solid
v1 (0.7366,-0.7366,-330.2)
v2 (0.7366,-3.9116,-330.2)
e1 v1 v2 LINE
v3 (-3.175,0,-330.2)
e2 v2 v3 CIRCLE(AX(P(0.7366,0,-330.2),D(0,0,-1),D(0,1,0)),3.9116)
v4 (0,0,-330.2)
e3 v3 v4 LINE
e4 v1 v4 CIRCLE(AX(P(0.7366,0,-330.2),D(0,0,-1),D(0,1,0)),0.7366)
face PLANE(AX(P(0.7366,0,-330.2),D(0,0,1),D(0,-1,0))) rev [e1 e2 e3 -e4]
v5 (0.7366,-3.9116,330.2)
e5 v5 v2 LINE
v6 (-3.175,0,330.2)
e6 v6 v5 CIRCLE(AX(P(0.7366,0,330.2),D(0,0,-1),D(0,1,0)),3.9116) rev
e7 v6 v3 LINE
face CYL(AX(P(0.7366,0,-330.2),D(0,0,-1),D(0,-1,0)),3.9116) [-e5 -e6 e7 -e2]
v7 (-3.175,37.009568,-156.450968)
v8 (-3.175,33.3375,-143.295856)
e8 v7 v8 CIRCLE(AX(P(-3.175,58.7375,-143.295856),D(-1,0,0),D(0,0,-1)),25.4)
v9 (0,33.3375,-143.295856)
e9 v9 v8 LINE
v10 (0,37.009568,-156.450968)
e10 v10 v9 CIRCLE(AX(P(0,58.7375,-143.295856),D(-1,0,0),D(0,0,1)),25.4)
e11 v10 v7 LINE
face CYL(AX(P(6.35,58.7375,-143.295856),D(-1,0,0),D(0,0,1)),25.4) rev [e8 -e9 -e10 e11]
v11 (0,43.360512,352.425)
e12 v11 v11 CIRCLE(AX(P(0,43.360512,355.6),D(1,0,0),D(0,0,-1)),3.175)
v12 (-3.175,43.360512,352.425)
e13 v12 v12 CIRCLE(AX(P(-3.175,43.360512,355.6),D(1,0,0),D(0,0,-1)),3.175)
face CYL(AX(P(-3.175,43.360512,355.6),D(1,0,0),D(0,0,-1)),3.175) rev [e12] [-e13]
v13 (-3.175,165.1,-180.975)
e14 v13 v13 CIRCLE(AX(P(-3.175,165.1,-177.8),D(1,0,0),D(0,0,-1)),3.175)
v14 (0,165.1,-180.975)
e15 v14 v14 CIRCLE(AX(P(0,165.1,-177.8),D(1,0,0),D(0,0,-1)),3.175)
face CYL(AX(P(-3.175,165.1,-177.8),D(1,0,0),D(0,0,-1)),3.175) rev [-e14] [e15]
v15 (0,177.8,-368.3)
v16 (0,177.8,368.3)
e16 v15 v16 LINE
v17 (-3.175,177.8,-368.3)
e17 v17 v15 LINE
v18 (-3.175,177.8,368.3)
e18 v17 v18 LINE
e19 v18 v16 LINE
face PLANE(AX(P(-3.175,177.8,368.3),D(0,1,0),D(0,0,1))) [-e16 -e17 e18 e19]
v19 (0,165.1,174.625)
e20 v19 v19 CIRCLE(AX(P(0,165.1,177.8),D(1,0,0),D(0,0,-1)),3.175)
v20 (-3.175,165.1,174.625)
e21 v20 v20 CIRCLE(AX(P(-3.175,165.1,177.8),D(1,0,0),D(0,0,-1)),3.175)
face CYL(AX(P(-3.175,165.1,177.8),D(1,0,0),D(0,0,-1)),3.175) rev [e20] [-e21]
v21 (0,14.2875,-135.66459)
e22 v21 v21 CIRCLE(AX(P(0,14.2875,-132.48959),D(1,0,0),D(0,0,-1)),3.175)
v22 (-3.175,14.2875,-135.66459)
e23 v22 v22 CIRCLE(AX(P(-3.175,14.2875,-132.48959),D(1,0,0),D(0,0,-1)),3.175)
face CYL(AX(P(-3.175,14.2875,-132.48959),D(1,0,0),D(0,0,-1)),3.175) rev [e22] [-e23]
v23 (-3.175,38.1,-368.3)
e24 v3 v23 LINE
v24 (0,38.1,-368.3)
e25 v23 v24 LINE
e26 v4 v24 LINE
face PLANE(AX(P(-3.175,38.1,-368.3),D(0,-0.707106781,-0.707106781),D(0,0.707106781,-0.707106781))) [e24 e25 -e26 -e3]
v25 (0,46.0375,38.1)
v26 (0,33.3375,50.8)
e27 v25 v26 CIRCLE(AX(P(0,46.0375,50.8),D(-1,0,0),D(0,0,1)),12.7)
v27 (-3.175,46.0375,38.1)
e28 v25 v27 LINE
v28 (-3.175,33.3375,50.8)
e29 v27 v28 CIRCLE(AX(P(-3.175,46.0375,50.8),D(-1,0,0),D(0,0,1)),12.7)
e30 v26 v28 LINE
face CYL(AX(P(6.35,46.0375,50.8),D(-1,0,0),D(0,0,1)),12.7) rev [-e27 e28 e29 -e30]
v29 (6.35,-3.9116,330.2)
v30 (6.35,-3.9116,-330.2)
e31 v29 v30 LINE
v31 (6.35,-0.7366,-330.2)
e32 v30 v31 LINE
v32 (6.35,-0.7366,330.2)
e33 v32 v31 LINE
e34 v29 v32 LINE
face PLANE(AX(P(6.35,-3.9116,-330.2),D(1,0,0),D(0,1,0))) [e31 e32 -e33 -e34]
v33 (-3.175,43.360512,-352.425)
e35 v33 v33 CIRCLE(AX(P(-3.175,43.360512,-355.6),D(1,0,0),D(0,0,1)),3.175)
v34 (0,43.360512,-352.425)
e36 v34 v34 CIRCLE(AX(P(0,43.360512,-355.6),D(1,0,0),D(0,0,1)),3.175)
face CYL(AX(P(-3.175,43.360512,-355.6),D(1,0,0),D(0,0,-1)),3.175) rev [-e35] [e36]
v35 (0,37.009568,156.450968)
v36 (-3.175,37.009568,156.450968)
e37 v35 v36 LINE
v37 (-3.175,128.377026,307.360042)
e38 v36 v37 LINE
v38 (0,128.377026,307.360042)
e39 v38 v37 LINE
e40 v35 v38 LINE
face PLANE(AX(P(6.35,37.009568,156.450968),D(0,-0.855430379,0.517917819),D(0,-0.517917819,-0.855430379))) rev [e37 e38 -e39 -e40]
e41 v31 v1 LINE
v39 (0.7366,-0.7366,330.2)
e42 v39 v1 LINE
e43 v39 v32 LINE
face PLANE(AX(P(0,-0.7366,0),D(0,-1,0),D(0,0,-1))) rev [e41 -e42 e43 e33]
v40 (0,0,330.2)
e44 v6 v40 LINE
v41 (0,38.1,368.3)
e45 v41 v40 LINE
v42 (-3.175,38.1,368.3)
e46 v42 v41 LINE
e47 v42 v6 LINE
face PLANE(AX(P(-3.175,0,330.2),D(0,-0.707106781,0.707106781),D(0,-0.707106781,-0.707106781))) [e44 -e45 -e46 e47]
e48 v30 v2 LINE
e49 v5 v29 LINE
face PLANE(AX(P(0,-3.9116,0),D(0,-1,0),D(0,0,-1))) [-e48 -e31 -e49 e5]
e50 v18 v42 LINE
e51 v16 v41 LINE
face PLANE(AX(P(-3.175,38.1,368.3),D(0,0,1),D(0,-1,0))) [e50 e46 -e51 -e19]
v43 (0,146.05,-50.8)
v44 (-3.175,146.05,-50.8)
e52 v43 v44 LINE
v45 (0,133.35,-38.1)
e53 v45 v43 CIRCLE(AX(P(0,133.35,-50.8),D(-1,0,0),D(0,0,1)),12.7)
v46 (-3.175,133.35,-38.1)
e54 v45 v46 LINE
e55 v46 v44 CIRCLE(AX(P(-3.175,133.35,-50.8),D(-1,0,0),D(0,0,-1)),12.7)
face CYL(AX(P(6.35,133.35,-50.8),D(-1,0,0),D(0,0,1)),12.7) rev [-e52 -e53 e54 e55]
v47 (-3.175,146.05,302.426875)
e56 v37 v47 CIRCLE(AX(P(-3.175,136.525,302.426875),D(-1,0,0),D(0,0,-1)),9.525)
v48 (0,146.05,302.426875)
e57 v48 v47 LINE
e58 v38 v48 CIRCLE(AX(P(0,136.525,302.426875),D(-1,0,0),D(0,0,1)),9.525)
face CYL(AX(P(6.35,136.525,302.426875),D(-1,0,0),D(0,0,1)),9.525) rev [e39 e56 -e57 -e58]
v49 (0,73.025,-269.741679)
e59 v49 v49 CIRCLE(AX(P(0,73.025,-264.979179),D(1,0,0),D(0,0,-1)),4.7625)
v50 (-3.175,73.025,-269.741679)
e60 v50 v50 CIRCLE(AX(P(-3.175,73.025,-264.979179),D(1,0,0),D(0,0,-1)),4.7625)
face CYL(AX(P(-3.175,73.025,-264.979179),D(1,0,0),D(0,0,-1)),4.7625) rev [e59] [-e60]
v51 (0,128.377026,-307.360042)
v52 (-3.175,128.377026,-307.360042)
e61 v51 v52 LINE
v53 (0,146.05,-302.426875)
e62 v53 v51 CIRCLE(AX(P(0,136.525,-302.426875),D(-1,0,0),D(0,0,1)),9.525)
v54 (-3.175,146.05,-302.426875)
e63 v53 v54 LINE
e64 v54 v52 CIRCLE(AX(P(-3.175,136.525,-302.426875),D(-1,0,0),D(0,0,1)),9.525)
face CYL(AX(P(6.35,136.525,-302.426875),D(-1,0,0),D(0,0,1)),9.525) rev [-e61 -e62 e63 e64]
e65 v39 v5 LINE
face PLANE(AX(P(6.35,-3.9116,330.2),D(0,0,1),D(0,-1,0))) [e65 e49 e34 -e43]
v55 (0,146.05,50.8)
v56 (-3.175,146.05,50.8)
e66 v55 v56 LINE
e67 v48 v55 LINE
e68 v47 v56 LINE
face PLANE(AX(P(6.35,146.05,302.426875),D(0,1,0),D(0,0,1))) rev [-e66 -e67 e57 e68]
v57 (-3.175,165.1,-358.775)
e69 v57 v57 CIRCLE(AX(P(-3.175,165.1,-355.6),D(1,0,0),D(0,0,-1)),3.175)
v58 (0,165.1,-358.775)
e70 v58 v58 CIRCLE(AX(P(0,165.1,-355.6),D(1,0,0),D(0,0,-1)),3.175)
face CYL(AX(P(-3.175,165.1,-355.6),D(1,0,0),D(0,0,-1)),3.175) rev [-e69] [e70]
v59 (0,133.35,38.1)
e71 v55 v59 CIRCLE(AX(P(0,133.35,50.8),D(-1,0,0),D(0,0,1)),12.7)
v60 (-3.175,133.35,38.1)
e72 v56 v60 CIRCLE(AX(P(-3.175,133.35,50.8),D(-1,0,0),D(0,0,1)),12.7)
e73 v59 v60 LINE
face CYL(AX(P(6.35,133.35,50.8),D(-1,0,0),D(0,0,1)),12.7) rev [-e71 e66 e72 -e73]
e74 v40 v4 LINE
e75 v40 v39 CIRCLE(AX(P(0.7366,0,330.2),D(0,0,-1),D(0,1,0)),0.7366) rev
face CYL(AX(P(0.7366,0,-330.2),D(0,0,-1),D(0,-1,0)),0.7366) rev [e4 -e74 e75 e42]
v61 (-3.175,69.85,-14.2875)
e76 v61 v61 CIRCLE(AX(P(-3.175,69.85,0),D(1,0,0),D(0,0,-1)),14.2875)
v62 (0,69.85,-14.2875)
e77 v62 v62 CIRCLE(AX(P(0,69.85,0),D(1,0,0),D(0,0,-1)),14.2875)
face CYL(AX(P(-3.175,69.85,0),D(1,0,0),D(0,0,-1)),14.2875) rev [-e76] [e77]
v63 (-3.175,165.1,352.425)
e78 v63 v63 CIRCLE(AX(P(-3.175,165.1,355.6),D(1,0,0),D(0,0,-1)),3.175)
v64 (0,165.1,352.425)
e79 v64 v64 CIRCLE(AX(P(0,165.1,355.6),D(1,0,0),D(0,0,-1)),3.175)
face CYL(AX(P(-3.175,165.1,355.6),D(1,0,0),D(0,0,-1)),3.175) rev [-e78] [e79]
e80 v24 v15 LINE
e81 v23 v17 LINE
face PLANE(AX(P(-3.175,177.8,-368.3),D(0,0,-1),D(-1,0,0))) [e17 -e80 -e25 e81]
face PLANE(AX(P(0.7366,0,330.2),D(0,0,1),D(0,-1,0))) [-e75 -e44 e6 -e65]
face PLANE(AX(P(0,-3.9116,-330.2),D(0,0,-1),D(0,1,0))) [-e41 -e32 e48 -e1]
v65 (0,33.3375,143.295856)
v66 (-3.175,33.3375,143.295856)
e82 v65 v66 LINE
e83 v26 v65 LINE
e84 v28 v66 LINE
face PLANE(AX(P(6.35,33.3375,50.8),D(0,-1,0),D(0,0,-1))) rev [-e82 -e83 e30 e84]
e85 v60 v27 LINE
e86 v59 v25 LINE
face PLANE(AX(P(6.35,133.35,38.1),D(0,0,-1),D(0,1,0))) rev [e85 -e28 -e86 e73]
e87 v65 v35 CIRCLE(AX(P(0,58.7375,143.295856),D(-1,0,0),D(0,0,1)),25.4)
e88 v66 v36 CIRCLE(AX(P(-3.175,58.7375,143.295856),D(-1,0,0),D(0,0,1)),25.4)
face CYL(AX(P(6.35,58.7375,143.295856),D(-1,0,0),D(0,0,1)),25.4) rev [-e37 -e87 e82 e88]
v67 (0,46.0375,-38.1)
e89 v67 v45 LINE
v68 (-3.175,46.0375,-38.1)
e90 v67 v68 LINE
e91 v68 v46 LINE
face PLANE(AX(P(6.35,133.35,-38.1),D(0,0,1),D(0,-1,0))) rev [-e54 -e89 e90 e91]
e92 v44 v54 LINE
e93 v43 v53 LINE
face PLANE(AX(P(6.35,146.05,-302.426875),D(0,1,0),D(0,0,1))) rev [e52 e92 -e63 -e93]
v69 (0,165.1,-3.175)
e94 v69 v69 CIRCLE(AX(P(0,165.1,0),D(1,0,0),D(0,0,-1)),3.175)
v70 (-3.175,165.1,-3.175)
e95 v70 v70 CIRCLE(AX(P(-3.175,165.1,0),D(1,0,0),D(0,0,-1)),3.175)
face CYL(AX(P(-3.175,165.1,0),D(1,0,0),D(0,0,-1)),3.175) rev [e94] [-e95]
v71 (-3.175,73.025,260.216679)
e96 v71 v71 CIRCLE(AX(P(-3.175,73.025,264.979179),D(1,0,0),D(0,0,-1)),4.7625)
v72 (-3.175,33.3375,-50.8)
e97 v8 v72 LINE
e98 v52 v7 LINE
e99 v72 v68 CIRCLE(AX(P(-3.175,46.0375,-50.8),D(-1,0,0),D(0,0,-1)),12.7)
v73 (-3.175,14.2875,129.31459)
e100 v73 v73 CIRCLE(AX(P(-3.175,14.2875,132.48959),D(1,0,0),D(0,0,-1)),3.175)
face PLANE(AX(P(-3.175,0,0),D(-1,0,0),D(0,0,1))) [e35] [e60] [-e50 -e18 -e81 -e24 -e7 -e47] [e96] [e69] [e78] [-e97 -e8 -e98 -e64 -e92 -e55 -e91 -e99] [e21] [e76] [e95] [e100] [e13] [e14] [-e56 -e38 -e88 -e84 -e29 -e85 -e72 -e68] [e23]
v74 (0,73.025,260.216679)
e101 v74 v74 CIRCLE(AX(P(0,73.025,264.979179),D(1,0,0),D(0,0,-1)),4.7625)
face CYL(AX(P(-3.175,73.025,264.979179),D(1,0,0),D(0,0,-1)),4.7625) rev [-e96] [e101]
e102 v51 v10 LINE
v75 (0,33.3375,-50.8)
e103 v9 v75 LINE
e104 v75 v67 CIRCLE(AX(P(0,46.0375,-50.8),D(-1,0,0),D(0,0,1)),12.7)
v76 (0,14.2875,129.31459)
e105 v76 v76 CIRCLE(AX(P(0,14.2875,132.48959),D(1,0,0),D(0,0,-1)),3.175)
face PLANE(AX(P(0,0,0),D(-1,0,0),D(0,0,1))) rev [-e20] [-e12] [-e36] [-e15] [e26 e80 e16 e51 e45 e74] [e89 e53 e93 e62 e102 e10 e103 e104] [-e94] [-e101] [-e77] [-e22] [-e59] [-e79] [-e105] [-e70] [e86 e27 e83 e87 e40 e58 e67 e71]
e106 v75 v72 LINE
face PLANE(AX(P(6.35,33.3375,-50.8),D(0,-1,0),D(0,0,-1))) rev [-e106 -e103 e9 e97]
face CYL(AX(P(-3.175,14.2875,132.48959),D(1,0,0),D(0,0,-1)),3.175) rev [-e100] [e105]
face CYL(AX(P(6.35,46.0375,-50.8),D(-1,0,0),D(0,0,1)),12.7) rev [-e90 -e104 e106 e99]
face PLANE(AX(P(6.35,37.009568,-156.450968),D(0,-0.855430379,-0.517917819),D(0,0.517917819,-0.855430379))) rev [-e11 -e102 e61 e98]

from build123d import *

# Parameters (mm, degrees)
BASE_FLANGE1_DEPTH = 3.175
EDGE_FLANGE1_DEPTH = 660.4
SKETCH9_R          = 3.175
SKETCH9_R_2        = 14.2875
SKETCH9_R_3        = 4.7625
CUT_EXTRUDE1_DEPTH = 410.020846046
CUT_EXTRUDE2_DEPTH = 410.082455778


# Sheet-metal steps are written as plain solids
with BuildPart() as part:
    # Sketch1 → Base-Flange1 (new body)
    with BuildSketch(Plane(origin=(0, 0, 0), x_dir=(0, 0, -1), z_dir=(1, 0, 0))):
        Polygon((330.2, 0), (-330.2, 0), (-368.3, 38.1), (-368.3, 177.8), (368.3, 177.8), (368.3, 38.1), align=None)
    extrude(amount=-BASE_FLANGE1_DEPTH)

    # Edge-Flange1 section (across the edge) → Edge-Flange1 (add)
    with BuildSketch(Plane(origin=(0, -0.7366, 330.2), x_dir=(0, 1, 0), z_dir=(0, 0, -1))):
        with BuildLine():
            Line((-3.175, 0.7366), (-3.175, 6.35))
            Line((-3.175, 6.35), (0, 6.35))
            Line((0, 6.35), (0, 0.7366))
            ThreePointArc((0, 0.7366), (0.215745145, 0.215745145), (0.7366, 0))
            Line((0.7366, 0), (0.7366, -3.175))
            ThreePointArc((0.7366, -3.175), (-2.029318885, -2.029318885), (-3.175, 0.7366))
        make_face()
    extrude(amount=EDGE_FLANGE1_DEPTH)

    # Sketch9 → Cut-Extrude1 (cut, through all)
    with BuildSketch(Plane(origin=(0, 0, 0), x_dir=(0, 0, -1), z_dir=(1, 0, 0))):
        with Locations((-355.6, 165.1)):
            Circle(SKETCH9_R)
        with Locations((-355.6, 43.360512242)):
            Circle(SKETCH9_R)
        with Locations((-177.8, 165.1)):
            Circle(SKETCH9_R)
        with Locations((0, 165.1)):
            Circle(SKETCH9_R)
        with Locations((-132.489589571, 14.2875)):
            Circle(SKETCH9_R)
        with Locations((132.489589571, 14.2875)):
            Circle(SKETCH9_R)
        with Locations((177.8, 165.1)):
            Circle(SKETCH9_R)
        with Locations((355.6, 165.1)):
            Circle(SKETCH9_R)
        with Locations(Location((355.6, 43.360512242, 0), (0, 0, 180))):
            Circle(SKETCH9_R)
        with Locations((0, 69.85)):
            Circle(SKETCH9_R_2)
        with Locations((-264.979179141, 73.025)):
            Circle(SKETCH9_R_3)
        with Locations((264.979179141, 73.025)):
            Circle(SKETCH9_R_3)
    extrude(amount=-CUT_EXTRUDE1_DEPTH, mode=Mode.SUBTRACT)

    # Sketch10 → Cut-Extrude2 (cut, through all)
    with BuildSketch(Plane.ZY.offset(3.175)):
        with BuildLine():
            Line((-302.426875206, 146.05), (-50.8, 146.05))
            ThreePointArc((-50.8, 146.05), (-41.819743879, 142.330256121), (-38.1, 133.35))
            Line((-38.1, 133.35), (-38.1, 46.0375))
            ThreePointArc((-38.1, 46.0375), (-41.819743879, 37.057243879), (-50.8, 33.3375))
            Line((-50.8, 33.3375), (-143.295855515, 33.3375))
            ThreePointArc((-143.295855515, 33.3375), (-150.12485752, 34.272734895), (-156.450968109, 37.009568376))
            Line((-156.450968109, 37.009568376), (-307.360042429, 128.377025641))
            ThreePointArc((-307.360042429, 128.377025641), (-311.60116212, 139.085875752), (-302.426875206, 146.05))
        make_face()
        with BuildLine():
            Line((38.1, 133.35), (38.1, 46.0375))
            ThreePointArc((38.1, 46.0375), (41.819743879, 37.057243879), (50.8, 33.3375))
            Line((50.8, 33.3375), (143.295855515, 33.3375))
            ThreePointArc((143.295855515, 33.3375), (150.12485752, 34.272734895), (156.450968109, 37.009568376))
            Line((156.450968109, 37.009568376), (307.360042429, 128.377025641))
            ThreePointArc((307.360042429, 128.377025641), (311.60116212, 139.085875752), (302.426875206, 146.05))
            Line((302.426875206, 146.05), (50.8, 146.05))
            ThreePointArc((50.8, 146.05), (41.819743879, 142.330256121), (38.1, 133.35))
        make_face()
    extrude(amount=-CUT_EXTRUDE2_DEPTH, mode=Mode.SUBTRACT)


solid = part.part
